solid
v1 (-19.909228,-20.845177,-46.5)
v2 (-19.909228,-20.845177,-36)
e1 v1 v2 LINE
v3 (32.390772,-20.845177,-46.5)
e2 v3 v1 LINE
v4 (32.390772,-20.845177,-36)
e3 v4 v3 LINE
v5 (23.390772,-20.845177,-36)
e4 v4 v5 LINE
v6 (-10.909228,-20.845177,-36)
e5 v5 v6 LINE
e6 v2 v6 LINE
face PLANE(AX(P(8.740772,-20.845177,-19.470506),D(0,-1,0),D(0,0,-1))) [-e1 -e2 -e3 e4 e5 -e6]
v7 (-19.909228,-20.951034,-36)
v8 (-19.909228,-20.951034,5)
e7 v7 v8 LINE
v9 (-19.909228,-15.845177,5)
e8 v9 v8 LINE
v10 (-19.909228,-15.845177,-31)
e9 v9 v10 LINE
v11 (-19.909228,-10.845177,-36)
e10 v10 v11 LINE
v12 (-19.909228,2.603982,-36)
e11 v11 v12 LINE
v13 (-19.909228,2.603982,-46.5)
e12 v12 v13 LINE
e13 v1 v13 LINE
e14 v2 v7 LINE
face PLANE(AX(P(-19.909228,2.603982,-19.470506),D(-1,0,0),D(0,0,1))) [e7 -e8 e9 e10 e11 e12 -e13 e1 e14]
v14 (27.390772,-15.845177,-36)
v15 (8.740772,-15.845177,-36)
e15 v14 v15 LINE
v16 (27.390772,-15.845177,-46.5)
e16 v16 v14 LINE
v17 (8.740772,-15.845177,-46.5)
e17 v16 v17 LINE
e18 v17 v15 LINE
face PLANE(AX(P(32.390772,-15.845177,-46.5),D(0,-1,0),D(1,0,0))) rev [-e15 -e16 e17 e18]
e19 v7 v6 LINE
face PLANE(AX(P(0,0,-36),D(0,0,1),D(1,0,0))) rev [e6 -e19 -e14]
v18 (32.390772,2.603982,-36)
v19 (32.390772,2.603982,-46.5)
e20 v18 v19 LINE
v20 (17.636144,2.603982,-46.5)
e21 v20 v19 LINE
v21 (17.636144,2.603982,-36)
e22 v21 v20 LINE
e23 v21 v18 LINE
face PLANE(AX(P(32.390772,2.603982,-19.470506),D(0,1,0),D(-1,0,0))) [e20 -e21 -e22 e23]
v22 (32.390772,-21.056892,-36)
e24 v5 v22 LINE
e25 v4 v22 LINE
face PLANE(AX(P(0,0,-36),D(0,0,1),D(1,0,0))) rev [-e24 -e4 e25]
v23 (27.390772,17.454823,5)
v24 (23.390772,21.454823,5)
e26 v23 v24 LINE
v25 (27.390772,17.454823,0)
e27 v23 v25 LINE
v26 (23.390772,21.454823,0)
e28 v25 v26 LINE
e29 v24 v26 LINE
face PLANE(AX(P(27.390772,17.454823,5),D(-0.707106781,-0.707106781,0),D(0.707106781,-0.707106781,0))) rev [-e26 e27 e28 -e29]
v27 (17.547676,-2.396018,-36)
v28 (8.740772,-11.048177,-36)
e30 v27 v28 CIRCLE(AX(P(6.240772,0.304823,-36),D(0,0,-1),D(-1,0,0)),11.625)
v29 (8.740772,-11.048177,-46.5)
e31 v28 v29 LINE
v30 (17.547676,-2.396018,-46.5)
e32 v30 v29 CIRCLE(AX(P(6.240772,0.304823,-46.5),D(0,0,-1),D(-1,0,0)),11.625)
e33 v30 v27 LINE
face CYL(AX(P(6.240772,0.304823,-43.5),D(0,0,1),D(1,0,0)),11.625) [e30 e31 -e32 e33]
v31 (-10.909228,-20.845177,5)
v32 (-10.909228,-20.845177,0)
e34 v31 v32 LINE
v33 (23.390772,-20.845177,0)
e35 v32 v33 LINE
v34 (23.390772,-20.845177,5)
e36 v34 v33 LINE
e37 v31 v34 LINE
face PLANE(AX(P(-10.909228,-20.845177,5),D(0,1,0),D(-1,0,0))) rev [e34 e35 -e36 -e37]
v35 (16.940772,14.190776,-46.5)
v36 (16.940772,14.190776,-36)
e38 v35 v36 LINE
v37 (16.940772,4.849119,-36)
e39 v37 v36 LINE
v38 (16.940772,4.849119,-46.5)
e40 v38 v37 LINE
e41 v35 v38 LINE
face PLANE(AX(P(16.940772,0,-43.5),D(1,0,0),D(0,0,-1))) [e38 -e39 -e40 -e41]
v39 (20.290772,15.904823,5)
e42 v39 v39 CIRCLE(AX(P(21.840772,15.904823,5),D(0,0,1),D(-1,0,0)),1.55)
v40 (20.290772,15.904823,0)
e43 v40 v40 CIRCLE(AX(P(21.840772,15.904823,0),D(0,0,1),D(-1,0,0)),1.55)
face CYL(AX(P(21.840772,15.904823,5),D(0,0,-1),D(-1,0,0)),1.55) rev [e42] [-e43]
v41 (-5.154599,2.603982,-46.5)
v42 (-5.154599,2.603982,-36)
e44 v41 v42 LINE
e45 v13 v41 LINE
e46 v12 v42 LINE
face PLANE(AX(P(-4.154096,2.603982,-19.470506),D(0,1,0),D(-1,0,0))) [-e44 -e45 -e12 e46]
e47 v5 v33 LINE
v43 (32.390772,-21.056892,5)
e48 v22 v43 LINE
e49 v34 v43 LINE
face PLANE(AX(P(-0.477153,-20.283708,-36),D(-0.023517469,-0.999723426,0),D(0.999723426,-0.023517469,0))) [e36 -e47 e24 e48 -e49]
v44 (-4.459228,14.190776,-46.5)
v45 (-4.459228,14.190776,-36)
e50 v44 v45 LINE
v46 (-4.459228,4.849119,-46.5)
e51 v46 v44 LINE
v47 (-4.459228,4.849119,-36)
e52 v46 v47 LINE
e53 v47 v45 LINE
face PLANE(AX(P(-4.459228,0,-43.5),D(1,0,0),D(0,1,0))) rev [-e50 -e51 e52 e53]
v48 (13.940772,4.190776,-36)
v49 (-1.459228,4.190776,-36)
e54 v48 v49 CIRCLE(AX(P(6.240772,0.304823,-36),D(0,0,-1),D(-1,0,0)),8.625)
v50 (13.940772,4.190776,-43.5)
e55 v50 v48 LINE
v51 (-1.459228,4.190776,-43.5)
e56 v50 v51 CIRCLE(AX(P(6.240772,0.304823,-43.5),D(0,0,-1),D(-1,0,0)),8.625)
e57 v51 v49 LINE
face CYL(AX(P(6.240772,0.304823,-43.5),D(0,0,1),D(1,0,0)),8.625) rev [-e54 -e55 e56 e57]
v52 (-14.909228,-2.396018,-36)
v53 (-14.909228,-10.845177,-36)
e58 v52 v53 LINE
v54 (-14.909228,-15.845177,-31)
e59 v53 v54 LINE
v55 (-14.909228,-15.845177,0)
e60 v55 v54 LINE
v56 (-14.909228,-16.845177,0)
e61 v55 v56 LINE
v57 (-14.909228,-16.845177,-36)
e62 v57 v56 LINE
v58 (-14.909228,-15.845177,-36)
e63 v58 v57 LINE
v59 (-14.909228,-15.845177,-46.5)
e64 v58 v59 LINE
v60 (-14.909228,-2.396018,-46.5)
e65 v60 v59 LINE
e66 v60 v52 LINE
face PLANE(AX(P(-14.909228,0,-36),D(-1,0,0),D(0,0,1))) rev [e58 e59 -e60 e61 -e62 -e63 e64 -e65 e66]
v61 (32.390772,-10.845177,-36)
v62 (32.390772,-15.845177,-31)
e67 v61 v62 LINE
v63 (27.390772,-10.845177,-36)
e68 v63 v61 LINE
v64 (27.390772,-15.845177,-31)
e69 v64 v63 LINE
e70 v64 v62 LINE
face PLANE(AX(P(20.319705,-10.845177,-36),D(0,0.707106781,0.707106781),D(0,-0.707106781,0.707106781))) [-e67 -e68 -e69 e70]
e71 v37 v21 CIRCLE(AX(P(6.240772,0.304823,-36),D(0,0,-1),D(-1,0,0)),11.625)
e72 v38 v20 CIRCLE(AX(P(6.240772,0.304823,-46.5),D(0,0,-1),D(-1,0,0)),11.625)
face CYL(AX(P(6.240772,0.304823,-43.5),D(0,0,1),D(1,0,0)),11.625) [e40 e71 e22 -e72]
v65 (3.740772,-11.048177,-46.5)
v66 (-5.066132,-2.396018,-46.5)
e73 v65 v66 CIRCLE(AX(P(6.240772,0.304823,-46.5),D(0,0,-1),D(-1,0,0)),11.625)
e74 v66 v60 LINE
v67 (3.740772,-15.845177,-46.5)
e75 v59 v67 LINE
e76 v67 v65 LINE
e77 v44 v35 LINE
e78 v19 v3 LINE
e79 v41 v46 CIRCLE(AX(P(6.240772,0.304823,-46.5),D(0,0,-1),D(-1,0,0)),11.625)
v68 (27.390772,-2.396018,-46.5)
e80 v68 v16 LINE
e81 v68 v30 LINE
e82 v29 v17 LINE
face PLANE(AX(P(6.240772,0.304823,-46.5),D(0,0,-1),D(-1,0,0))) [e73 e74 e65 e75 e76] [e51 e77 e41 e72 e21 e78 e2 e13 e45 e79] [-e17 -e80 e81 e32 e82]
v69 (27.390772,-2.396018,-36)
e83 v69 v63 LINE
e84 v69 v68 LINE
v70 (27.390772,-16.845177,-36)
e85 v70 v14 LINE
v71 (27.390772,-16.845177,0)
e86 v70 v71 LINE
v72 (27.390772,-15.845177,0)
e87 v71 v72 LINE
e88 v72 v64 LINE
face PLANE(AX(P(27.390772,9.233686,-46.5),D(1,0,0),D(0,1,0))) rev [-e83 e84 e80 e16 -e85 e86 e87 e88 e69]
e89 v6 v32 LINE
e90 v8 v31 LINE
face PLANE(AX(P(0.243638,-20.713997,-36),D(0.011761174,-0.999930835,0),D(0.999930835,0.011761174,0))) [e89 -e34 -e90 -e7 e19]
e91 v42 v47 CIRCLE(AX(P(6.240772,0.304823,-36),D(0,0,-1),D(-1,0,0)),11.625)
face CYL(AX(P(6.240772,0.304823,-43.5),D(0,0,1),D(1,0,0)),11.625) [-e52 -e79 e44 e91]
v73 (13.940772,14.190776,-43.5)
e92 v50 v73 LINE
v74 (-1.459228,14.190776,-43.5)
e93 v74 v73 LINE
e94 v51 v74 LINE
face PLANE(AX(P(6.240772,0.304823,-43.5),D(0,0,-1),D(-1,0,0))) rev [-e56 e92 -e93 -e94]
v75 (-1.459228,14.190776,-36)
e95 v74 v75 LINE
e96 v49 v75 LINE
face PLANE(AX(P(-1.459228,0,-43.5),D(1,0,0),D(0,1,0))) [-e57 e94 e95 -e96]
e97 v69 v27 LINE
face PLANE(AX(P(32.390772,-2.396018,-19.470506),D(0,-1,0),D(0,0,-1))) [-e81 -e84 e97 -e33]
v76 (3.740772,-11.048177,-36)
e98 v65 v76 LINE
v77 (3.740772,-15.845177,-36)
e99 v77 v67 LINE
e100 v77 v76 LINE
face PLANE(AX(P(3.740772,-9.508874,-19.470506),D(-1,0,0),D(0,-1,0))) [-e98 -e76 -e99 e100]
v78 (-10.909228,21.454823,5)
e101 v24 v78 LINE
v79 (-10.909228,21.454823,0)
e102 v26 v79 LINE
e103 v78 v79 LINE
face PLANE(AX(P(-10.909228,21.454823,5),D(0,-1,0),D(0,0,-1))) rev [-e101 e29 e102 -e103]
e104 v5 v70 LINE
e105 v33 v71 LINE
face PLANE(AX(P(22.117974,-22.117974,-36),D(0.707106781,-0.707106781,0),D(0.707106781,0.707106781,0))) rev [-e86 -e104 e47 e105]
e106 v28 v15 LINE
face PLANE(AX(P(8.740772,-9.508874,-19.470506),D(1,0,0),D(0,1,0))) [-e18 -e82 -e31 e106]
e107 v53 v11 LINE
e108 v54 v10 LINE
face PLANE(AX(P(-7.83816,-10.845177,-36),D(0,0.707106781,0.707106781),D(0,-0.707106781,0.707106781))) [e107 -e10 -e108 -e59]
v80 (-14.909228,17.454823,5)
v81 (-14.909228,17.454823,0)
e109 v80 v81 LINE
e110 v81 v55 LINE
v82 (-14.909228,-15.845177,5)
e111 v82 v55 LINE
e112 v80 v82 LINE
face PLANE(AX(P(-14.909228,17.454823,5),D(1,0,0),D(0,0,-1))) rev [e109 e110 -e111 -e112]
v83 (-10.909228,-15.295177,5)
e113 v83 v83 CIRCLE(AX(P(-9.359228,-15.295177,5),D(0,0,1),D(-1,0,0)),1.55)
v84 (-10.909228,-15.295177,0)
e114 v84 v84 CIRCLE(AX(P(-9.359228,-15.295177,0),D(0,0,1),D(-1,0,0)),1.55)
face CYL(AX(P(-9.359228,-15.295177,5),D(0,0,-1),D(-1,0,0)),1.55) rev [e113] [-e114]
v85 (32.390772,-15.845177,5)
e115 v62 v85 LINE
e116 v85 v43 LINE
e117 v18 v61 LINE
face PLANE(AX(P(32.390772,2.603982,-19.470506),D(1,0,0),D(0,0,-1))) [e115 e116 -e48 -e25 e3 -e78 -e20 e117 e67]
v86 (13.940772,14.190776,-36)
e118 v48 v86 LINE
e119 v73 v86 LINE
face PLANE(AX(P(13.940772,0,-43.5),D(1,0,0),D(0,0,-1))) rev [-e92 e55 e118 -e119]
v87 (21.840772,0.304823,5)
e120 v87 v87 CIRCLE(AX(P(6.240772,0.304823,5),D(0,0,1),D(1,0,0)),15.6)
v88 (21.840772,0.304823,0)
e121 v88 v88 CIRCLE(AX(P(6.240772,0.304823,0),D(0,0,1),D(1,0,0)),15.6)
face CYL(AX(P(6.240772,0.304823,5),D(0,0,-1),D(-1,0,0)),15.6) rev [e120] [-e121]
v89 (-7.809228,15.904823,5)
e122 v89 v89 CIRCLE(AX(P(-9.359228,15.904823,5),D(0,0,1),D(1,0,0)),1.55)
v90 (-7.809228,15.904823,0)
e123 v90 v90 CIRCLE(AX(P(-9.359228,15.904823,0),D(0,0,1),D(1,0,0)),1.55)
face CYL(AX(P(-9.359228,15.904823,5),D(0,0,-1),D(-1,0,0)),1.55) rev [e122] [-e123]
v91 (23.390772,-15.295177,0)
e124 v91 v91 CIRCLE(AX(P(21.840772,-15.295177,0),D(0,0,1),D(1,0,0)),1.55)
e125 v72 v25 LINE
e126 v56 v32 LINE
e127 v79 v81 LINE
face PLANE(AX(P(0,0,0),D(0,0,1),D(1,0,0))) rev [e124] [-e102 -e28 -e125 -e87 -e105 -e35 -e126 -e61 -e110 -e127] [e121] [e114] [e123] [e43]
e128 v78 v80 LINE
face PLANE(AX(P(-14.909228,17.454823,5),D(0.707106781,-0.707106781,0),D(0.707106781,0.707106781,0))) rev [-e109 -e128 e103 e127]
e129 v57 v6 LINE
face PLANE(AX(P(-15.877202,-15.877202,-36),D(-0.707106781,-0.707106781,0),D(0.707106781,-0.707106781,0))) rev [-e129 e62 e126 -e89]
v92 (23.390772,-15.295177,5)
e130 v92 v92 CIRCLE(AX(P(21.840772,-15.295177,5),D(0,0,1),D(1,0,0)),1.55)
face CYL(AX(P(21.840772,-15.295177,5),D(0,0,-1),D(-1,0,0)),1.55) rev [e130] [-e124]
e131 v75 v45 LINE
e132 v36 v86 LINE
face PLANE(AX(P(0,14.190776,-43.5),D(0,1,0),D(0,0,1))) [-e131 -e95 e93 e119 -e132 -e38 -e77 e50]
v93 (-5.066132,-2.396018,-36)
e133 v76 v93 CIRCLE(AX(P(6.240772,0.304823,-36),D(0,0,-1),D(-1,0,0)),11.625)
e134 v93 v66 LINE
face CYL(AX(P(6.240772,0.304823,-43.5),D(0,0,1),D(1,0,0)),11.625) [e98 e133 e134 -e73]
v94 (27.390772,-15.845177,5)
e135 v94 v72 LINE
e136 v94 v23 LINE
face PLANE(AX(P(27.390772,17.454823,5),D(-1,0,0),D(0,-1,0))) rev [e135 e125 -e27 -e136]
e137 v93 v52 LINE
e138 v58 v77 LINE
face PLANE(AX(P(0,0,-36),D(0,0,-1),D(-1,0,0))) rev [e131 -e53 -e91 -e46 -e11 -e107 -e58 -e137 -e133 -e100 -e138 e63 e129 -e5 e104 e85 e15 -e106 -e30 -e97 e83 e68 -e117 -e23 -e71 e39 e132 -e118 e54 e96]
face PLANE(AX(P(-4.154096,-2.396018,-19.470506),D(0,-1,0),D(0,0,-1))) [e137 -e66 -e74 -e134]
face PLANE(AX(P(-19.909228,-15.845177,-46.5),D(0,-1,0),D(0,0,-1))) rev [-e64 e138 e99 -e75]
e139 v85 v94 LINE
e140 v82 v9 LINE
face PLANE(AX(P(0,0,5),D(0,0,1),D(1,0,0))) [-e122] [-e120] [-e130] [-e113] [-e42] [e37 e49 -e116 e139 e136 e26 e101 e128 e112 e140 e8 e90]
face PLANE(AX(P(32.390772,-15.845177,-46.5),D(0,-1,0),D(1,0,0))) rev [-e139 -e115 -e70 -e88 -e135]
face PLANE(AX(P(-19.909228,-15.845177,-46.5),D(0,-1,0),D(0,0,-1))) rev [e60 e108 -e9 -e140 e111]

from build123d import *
from build123d.topology import SkipClean

# Parameters (mm, degrees)
SKETCH2_R            = 1.55
SKETCH2_R_2          = 15.6
BOSS_EXTRUDE1_DEPTH  = 5
BOSS_EXTRUDE3_DEPTH  = 41
BOSS_EXTRUDE4_DEPTH  = 7.5
BOSS_EXTRUDE5_DEPTH  = 3
BOSS_EXTRUDE6_START  = -7.5
BOSS_EXTRUDE6_DEPTH  = 10.5
SKETCH12_W           = 10.5
SKETCH12_H           = 5
BOSS_EXTRUDE8_DEPTH  = 23.65
SKETCH13_W           = 10.5
SKETCH13_H           = 5
BOSS_EXTRUDE9_DEPTH  = 23.65
SKETCH14_W           = 5
SKETCH14_H           = 28.65
CUT_EXTRUDE1_DEPTH   = 41
SKETCH15_W           = 5
SKETCH15_H           = 10.5
BOSS_EXTRUDE10_DEPTH = 13.449158782
BOSS_EXTRUDE11_DEPTH = 5
BOSS_EXTRUDE12_DEPTH = 5


# Read off the part's stored shape, not the designer's step: Boss-Extrude6
with BuildPart() as part:
    # Sketch2 → Boss-Extrude1 (new body)
    with BuildSketch(Plane.XY):
        Polygon((-10.909227683, 21.454823411), (23.390772317, 21.454823411), (27.390772317, 17.454823411), (27.390772317, -16.845176589), (23.390772317, -20.845176589), (-10.909227683, -20.845176589), (-14.909227683, -16.845176589), (-14.909227683, 17.454823411), align=None)
        with Locations((-9.359227683, 15.904823411)):
            Circle(SKETCH2_R, mode=Mode.SUBTRACT)
        with Locations(Location((21.840772317, 15.904823411, 0), (0, 0, 180))):
            Circle(SKETCH2_R, mode=Mode.SUBTRACT)
        with Locations((21.840772317, -15.295176589)):
            Circle(SKETCH2_R, mode=Mode.SUBTRACT)
        with Locations(Location((-9.359227683, -15.295176589, 0), (0, 0, 180))):
            Circle(SKETCH2_R, mode=Mode.SUBTRACT)
        with Locations((6.240772317, 0.304823411)):
            Circle(SKETCH2_R_2, mode=Mode.SUBTRACT)
    extrude(amount=BOSS_EXTRUDE1_DEPTH)

    # Sketch4 → Boss-Extrude3 (add)
    with BuildSketch(Plane.XY.offset(5)):
        Polygon((-14.909227683, -12.195176589), (-14.909227683, 0.304823411), (-14.909227683, 12.804823411), (-19.909227683, 12.804823411), (-19.909227683, -12.195176589), (-19.909227683, -20.951034478), (-10.909227683, -20.845176589), (-14.909227683, -16.845176589), align=None)
        Polygon((32.390772317, 12.804823411), (27.390772317, 12.804823411), (27.390772317, 0.304823411), (27.390772317, -12.195176589), (27.390772317, -16.845176589), (23.390772317, -20.845176589), (32.390772317, -21.056892366), (32.390772317, -12.195176589), align=None)
    extrude(amount=-BOSS_EXTRUDE3_DEPTH)

    # Sketch12 → Boss-Extrude8 (add)
    with BuildSketch(Plane.ZY.offset(-3.740772317)):
        with Locations((-41.25, -18.345176589)):
            Rectangle(SKETCH12_W, SKETCH12_H)
    extrude(amount=BOSS_EXTRUDE8_DEPTH)

    # Sketch13 → Boss-Extrude9 (add)
    with BuildSketch(Plane(origin=(8.740772317, 0, 0), x_dir=(0, 0, -1), z_dir=(1, 0, 0))):
        with Locations((41.25, -18.345176589)):
            Rectangle(SKETCH13_W, SKETCH13_H)
    extrude(amount=BOSS_EXTRUDE9_DEPTH)

    # Sketch14 → Cut-Extrude1 (cut)
    with BuildSketch(Plane(origin=(0, 0, -36), x_dir=(-1, 0, 0), z_dir=(0, 0, -1))):
        with Locations((-29.890772317, -1.520176589)):
            Rectangle(SKETCH14_W, SKETCH14_H)
        with Locations((17.409227683, -1.520176589)):
            Rectangle(SKETCH14_W, SKETCH14_H)
    extrude(amount=-CUT_EXTRUDE1_DEPTH, mode=Mode.SUBTRACT)



with BuildPart() as body_2:
    # Sketch5 → Boss-Extrude4 (new body)
    with BuildSketch(Plane(origin=(0, 0, -36), x_dir=(-1, 0, 0), z_dir=(0, 0, -1))):
        with BuildLine():
            ThreePointArc((1.459227683, 4.190775675), (-6.240772317, -8.320176589), (-13.940772317, 4.190775675))
            Line((-13.940772317, 4.190775675), (-13.940772317, 11.190775675))
            Line((-13.940772317, 11.190775675), (-13.940772317, 14.190775675))
            Line((-13.940772317, 14.190775675), (-16.940772317, 14.190775675))
            Line((-16.940772317, 14.190775675), (-16.940772317, 4.849119286))
            ThreePointArc((-16.940772317, 4.849119286), (-6.240772317, -11.320176589), (4.459227683, 4.849119286))
            Line((4.459227683, 4.849119286), (4.459227683, 14.190775675))
            Line((4.459227683, 14.190775675), (1.459227683, 14.190775675))
            Line((1.459227683, 14.190775675), (1.459227683, 11.190775675))
            Line((1.459227683, 11.190775675), (1.459227683, 4.190775675))
        make_face()
    extrude(amount=BOSS_EXTRUDE4_DEPTH)

    # Sketch6 → Boss-Extrude5 (add)
    with SkipClean():  # the faces are left unmerged after this step: merging them gives an invalid solid
        with BuildSketch(Plane(origin=(0, 0, -43.5), x_dir=(-1, 0, 0), z_dir=(0, 0, -1))):
            with BuildLine():
                Line((-16.940772317, 4.849119286), (-16.940772317, 14.190775675))
                Line((-16.940772317, 14.190775675), (4.459227683, 14.190775675))
                Line((4.459227683, 14.190775675), (4.459227683, 4.849119286))
                ThreePointArc((4.459227683, 4.849119286), (-6.240772317, -11.320176589), (-16.940772317, 4.849119286))
            make_face()
        extrude(amount=BOSS_EXTRUDE5_DEPTH)

    # Boss-Extrude6 outline → Boss-Extrude6 (add)
    with SkipClean():  # the faces are left unmerged after this step: merging them gives an invalid solid
        with BuildSketch(Plane(origin=(0, 0, -43.5), x_dir=(-1, 0, 0), z_dir=(0, 0, -1)).offset(BOSS_EXTRUDE6_START)):
            with BuildLine():
                Line((-8.740772317, -20.845176589), (-3.740772317, -20.845176589))
                Line((-3.740772317, -20.845176589), (-3.740772317, -11.048177294))
                ThreePointArc((-3.740772317, -11.048177294), (-6.240772317, -11.320176589), (-8.740772317, -11.048177294))
                Line((-8.740772317, -11.048177294), (-8.740772317, -20.845176589))
            make_face()
            with BuildLine():
                Line((-32.390772317, -2.396017807), (-17.547676478, -2.396017807))
                ThreePointArc((-17.547676478, -2.396017807), (-17.863953086, 0.099168806), (-17.636143917, 2.603982193))
                Line((-17.636143917, 2.603982193), (-32.390772317, 2.603982193))
                Line((-32.390772317, 2.603982193), (-32.390772317, -2.396017807))
            make_face()
            with BuildLine():
                ThreePointArc((5.154599283, 2.603982193), (5.382408452, 0.099168806), (5.066131844, -2.396017807))
                Line((5.066131844, -2.396017807), (19.909227683, -2.396017807))
                Line((19.909227683, -2.396017807), (19.909227683, 2.603982193))
                Line((19.909227683, 2.603982193), (5.154599283, 2.603982193))
            make_face()
        extrude(amount=BOSS_EXTRUDE6_DEPTH)


with BuildPart() as part_1:
    with SkipClean():  # the faces are left unmerged after this step: merging them gives an invalid solid
        add(part.part)

        add(body_2.part)  # Boss-Extrude10 merges body 2
        # Sketch15 → Boss-Extrude10 (add)
        with BuildSketch(Plane(origin=(0, -15.845176589, 0), x_dir=(1, 0, 0), z_dir=(0, 1, 0))):
            with Locations((29.890772317, 41.25)):
                Rectangle(SKETCH15_W, SKETCH15_H)
            with Locations((-17.409227683, 41.25)):
                Rectangle(SKETCH15_W, SKETCH15_H)
        extrude(amount=BOSS_EXTRUDE10_DEPTH)

    # Sketch16 → Boss-Extrude11 (add)
    with SkipClean():  # the faces are left unmerged after this step: merging them gives an invalid solid
        with BuildSketch(Plane(origin=(32.390772317, 0, 0), x_dir=(0, 0, -1), z_dir=(1, 0, 0))):
            Polygon((36, -10.845176589), (31, -15.845176589), (36, -15.845176589), align=None)
        extrude(amount=-BOSS_EXTRUDE11_DEPTH)

    # Sketch18 → Boss-Extrude12 (add)
    with SkipClean():  # the faces are left unmerged after this step: merging them gives an invalid solid
        with BuildSketch(Plane.ZY.offset(19.909227683)):
            Polygon((-36, -10.845176589), (-31, -15.845176589), (-36, -15.845176589), align=None)
        extrude(amount=-BOSS_EXTRUDE12_DEPTH)


solid = part_1.part
